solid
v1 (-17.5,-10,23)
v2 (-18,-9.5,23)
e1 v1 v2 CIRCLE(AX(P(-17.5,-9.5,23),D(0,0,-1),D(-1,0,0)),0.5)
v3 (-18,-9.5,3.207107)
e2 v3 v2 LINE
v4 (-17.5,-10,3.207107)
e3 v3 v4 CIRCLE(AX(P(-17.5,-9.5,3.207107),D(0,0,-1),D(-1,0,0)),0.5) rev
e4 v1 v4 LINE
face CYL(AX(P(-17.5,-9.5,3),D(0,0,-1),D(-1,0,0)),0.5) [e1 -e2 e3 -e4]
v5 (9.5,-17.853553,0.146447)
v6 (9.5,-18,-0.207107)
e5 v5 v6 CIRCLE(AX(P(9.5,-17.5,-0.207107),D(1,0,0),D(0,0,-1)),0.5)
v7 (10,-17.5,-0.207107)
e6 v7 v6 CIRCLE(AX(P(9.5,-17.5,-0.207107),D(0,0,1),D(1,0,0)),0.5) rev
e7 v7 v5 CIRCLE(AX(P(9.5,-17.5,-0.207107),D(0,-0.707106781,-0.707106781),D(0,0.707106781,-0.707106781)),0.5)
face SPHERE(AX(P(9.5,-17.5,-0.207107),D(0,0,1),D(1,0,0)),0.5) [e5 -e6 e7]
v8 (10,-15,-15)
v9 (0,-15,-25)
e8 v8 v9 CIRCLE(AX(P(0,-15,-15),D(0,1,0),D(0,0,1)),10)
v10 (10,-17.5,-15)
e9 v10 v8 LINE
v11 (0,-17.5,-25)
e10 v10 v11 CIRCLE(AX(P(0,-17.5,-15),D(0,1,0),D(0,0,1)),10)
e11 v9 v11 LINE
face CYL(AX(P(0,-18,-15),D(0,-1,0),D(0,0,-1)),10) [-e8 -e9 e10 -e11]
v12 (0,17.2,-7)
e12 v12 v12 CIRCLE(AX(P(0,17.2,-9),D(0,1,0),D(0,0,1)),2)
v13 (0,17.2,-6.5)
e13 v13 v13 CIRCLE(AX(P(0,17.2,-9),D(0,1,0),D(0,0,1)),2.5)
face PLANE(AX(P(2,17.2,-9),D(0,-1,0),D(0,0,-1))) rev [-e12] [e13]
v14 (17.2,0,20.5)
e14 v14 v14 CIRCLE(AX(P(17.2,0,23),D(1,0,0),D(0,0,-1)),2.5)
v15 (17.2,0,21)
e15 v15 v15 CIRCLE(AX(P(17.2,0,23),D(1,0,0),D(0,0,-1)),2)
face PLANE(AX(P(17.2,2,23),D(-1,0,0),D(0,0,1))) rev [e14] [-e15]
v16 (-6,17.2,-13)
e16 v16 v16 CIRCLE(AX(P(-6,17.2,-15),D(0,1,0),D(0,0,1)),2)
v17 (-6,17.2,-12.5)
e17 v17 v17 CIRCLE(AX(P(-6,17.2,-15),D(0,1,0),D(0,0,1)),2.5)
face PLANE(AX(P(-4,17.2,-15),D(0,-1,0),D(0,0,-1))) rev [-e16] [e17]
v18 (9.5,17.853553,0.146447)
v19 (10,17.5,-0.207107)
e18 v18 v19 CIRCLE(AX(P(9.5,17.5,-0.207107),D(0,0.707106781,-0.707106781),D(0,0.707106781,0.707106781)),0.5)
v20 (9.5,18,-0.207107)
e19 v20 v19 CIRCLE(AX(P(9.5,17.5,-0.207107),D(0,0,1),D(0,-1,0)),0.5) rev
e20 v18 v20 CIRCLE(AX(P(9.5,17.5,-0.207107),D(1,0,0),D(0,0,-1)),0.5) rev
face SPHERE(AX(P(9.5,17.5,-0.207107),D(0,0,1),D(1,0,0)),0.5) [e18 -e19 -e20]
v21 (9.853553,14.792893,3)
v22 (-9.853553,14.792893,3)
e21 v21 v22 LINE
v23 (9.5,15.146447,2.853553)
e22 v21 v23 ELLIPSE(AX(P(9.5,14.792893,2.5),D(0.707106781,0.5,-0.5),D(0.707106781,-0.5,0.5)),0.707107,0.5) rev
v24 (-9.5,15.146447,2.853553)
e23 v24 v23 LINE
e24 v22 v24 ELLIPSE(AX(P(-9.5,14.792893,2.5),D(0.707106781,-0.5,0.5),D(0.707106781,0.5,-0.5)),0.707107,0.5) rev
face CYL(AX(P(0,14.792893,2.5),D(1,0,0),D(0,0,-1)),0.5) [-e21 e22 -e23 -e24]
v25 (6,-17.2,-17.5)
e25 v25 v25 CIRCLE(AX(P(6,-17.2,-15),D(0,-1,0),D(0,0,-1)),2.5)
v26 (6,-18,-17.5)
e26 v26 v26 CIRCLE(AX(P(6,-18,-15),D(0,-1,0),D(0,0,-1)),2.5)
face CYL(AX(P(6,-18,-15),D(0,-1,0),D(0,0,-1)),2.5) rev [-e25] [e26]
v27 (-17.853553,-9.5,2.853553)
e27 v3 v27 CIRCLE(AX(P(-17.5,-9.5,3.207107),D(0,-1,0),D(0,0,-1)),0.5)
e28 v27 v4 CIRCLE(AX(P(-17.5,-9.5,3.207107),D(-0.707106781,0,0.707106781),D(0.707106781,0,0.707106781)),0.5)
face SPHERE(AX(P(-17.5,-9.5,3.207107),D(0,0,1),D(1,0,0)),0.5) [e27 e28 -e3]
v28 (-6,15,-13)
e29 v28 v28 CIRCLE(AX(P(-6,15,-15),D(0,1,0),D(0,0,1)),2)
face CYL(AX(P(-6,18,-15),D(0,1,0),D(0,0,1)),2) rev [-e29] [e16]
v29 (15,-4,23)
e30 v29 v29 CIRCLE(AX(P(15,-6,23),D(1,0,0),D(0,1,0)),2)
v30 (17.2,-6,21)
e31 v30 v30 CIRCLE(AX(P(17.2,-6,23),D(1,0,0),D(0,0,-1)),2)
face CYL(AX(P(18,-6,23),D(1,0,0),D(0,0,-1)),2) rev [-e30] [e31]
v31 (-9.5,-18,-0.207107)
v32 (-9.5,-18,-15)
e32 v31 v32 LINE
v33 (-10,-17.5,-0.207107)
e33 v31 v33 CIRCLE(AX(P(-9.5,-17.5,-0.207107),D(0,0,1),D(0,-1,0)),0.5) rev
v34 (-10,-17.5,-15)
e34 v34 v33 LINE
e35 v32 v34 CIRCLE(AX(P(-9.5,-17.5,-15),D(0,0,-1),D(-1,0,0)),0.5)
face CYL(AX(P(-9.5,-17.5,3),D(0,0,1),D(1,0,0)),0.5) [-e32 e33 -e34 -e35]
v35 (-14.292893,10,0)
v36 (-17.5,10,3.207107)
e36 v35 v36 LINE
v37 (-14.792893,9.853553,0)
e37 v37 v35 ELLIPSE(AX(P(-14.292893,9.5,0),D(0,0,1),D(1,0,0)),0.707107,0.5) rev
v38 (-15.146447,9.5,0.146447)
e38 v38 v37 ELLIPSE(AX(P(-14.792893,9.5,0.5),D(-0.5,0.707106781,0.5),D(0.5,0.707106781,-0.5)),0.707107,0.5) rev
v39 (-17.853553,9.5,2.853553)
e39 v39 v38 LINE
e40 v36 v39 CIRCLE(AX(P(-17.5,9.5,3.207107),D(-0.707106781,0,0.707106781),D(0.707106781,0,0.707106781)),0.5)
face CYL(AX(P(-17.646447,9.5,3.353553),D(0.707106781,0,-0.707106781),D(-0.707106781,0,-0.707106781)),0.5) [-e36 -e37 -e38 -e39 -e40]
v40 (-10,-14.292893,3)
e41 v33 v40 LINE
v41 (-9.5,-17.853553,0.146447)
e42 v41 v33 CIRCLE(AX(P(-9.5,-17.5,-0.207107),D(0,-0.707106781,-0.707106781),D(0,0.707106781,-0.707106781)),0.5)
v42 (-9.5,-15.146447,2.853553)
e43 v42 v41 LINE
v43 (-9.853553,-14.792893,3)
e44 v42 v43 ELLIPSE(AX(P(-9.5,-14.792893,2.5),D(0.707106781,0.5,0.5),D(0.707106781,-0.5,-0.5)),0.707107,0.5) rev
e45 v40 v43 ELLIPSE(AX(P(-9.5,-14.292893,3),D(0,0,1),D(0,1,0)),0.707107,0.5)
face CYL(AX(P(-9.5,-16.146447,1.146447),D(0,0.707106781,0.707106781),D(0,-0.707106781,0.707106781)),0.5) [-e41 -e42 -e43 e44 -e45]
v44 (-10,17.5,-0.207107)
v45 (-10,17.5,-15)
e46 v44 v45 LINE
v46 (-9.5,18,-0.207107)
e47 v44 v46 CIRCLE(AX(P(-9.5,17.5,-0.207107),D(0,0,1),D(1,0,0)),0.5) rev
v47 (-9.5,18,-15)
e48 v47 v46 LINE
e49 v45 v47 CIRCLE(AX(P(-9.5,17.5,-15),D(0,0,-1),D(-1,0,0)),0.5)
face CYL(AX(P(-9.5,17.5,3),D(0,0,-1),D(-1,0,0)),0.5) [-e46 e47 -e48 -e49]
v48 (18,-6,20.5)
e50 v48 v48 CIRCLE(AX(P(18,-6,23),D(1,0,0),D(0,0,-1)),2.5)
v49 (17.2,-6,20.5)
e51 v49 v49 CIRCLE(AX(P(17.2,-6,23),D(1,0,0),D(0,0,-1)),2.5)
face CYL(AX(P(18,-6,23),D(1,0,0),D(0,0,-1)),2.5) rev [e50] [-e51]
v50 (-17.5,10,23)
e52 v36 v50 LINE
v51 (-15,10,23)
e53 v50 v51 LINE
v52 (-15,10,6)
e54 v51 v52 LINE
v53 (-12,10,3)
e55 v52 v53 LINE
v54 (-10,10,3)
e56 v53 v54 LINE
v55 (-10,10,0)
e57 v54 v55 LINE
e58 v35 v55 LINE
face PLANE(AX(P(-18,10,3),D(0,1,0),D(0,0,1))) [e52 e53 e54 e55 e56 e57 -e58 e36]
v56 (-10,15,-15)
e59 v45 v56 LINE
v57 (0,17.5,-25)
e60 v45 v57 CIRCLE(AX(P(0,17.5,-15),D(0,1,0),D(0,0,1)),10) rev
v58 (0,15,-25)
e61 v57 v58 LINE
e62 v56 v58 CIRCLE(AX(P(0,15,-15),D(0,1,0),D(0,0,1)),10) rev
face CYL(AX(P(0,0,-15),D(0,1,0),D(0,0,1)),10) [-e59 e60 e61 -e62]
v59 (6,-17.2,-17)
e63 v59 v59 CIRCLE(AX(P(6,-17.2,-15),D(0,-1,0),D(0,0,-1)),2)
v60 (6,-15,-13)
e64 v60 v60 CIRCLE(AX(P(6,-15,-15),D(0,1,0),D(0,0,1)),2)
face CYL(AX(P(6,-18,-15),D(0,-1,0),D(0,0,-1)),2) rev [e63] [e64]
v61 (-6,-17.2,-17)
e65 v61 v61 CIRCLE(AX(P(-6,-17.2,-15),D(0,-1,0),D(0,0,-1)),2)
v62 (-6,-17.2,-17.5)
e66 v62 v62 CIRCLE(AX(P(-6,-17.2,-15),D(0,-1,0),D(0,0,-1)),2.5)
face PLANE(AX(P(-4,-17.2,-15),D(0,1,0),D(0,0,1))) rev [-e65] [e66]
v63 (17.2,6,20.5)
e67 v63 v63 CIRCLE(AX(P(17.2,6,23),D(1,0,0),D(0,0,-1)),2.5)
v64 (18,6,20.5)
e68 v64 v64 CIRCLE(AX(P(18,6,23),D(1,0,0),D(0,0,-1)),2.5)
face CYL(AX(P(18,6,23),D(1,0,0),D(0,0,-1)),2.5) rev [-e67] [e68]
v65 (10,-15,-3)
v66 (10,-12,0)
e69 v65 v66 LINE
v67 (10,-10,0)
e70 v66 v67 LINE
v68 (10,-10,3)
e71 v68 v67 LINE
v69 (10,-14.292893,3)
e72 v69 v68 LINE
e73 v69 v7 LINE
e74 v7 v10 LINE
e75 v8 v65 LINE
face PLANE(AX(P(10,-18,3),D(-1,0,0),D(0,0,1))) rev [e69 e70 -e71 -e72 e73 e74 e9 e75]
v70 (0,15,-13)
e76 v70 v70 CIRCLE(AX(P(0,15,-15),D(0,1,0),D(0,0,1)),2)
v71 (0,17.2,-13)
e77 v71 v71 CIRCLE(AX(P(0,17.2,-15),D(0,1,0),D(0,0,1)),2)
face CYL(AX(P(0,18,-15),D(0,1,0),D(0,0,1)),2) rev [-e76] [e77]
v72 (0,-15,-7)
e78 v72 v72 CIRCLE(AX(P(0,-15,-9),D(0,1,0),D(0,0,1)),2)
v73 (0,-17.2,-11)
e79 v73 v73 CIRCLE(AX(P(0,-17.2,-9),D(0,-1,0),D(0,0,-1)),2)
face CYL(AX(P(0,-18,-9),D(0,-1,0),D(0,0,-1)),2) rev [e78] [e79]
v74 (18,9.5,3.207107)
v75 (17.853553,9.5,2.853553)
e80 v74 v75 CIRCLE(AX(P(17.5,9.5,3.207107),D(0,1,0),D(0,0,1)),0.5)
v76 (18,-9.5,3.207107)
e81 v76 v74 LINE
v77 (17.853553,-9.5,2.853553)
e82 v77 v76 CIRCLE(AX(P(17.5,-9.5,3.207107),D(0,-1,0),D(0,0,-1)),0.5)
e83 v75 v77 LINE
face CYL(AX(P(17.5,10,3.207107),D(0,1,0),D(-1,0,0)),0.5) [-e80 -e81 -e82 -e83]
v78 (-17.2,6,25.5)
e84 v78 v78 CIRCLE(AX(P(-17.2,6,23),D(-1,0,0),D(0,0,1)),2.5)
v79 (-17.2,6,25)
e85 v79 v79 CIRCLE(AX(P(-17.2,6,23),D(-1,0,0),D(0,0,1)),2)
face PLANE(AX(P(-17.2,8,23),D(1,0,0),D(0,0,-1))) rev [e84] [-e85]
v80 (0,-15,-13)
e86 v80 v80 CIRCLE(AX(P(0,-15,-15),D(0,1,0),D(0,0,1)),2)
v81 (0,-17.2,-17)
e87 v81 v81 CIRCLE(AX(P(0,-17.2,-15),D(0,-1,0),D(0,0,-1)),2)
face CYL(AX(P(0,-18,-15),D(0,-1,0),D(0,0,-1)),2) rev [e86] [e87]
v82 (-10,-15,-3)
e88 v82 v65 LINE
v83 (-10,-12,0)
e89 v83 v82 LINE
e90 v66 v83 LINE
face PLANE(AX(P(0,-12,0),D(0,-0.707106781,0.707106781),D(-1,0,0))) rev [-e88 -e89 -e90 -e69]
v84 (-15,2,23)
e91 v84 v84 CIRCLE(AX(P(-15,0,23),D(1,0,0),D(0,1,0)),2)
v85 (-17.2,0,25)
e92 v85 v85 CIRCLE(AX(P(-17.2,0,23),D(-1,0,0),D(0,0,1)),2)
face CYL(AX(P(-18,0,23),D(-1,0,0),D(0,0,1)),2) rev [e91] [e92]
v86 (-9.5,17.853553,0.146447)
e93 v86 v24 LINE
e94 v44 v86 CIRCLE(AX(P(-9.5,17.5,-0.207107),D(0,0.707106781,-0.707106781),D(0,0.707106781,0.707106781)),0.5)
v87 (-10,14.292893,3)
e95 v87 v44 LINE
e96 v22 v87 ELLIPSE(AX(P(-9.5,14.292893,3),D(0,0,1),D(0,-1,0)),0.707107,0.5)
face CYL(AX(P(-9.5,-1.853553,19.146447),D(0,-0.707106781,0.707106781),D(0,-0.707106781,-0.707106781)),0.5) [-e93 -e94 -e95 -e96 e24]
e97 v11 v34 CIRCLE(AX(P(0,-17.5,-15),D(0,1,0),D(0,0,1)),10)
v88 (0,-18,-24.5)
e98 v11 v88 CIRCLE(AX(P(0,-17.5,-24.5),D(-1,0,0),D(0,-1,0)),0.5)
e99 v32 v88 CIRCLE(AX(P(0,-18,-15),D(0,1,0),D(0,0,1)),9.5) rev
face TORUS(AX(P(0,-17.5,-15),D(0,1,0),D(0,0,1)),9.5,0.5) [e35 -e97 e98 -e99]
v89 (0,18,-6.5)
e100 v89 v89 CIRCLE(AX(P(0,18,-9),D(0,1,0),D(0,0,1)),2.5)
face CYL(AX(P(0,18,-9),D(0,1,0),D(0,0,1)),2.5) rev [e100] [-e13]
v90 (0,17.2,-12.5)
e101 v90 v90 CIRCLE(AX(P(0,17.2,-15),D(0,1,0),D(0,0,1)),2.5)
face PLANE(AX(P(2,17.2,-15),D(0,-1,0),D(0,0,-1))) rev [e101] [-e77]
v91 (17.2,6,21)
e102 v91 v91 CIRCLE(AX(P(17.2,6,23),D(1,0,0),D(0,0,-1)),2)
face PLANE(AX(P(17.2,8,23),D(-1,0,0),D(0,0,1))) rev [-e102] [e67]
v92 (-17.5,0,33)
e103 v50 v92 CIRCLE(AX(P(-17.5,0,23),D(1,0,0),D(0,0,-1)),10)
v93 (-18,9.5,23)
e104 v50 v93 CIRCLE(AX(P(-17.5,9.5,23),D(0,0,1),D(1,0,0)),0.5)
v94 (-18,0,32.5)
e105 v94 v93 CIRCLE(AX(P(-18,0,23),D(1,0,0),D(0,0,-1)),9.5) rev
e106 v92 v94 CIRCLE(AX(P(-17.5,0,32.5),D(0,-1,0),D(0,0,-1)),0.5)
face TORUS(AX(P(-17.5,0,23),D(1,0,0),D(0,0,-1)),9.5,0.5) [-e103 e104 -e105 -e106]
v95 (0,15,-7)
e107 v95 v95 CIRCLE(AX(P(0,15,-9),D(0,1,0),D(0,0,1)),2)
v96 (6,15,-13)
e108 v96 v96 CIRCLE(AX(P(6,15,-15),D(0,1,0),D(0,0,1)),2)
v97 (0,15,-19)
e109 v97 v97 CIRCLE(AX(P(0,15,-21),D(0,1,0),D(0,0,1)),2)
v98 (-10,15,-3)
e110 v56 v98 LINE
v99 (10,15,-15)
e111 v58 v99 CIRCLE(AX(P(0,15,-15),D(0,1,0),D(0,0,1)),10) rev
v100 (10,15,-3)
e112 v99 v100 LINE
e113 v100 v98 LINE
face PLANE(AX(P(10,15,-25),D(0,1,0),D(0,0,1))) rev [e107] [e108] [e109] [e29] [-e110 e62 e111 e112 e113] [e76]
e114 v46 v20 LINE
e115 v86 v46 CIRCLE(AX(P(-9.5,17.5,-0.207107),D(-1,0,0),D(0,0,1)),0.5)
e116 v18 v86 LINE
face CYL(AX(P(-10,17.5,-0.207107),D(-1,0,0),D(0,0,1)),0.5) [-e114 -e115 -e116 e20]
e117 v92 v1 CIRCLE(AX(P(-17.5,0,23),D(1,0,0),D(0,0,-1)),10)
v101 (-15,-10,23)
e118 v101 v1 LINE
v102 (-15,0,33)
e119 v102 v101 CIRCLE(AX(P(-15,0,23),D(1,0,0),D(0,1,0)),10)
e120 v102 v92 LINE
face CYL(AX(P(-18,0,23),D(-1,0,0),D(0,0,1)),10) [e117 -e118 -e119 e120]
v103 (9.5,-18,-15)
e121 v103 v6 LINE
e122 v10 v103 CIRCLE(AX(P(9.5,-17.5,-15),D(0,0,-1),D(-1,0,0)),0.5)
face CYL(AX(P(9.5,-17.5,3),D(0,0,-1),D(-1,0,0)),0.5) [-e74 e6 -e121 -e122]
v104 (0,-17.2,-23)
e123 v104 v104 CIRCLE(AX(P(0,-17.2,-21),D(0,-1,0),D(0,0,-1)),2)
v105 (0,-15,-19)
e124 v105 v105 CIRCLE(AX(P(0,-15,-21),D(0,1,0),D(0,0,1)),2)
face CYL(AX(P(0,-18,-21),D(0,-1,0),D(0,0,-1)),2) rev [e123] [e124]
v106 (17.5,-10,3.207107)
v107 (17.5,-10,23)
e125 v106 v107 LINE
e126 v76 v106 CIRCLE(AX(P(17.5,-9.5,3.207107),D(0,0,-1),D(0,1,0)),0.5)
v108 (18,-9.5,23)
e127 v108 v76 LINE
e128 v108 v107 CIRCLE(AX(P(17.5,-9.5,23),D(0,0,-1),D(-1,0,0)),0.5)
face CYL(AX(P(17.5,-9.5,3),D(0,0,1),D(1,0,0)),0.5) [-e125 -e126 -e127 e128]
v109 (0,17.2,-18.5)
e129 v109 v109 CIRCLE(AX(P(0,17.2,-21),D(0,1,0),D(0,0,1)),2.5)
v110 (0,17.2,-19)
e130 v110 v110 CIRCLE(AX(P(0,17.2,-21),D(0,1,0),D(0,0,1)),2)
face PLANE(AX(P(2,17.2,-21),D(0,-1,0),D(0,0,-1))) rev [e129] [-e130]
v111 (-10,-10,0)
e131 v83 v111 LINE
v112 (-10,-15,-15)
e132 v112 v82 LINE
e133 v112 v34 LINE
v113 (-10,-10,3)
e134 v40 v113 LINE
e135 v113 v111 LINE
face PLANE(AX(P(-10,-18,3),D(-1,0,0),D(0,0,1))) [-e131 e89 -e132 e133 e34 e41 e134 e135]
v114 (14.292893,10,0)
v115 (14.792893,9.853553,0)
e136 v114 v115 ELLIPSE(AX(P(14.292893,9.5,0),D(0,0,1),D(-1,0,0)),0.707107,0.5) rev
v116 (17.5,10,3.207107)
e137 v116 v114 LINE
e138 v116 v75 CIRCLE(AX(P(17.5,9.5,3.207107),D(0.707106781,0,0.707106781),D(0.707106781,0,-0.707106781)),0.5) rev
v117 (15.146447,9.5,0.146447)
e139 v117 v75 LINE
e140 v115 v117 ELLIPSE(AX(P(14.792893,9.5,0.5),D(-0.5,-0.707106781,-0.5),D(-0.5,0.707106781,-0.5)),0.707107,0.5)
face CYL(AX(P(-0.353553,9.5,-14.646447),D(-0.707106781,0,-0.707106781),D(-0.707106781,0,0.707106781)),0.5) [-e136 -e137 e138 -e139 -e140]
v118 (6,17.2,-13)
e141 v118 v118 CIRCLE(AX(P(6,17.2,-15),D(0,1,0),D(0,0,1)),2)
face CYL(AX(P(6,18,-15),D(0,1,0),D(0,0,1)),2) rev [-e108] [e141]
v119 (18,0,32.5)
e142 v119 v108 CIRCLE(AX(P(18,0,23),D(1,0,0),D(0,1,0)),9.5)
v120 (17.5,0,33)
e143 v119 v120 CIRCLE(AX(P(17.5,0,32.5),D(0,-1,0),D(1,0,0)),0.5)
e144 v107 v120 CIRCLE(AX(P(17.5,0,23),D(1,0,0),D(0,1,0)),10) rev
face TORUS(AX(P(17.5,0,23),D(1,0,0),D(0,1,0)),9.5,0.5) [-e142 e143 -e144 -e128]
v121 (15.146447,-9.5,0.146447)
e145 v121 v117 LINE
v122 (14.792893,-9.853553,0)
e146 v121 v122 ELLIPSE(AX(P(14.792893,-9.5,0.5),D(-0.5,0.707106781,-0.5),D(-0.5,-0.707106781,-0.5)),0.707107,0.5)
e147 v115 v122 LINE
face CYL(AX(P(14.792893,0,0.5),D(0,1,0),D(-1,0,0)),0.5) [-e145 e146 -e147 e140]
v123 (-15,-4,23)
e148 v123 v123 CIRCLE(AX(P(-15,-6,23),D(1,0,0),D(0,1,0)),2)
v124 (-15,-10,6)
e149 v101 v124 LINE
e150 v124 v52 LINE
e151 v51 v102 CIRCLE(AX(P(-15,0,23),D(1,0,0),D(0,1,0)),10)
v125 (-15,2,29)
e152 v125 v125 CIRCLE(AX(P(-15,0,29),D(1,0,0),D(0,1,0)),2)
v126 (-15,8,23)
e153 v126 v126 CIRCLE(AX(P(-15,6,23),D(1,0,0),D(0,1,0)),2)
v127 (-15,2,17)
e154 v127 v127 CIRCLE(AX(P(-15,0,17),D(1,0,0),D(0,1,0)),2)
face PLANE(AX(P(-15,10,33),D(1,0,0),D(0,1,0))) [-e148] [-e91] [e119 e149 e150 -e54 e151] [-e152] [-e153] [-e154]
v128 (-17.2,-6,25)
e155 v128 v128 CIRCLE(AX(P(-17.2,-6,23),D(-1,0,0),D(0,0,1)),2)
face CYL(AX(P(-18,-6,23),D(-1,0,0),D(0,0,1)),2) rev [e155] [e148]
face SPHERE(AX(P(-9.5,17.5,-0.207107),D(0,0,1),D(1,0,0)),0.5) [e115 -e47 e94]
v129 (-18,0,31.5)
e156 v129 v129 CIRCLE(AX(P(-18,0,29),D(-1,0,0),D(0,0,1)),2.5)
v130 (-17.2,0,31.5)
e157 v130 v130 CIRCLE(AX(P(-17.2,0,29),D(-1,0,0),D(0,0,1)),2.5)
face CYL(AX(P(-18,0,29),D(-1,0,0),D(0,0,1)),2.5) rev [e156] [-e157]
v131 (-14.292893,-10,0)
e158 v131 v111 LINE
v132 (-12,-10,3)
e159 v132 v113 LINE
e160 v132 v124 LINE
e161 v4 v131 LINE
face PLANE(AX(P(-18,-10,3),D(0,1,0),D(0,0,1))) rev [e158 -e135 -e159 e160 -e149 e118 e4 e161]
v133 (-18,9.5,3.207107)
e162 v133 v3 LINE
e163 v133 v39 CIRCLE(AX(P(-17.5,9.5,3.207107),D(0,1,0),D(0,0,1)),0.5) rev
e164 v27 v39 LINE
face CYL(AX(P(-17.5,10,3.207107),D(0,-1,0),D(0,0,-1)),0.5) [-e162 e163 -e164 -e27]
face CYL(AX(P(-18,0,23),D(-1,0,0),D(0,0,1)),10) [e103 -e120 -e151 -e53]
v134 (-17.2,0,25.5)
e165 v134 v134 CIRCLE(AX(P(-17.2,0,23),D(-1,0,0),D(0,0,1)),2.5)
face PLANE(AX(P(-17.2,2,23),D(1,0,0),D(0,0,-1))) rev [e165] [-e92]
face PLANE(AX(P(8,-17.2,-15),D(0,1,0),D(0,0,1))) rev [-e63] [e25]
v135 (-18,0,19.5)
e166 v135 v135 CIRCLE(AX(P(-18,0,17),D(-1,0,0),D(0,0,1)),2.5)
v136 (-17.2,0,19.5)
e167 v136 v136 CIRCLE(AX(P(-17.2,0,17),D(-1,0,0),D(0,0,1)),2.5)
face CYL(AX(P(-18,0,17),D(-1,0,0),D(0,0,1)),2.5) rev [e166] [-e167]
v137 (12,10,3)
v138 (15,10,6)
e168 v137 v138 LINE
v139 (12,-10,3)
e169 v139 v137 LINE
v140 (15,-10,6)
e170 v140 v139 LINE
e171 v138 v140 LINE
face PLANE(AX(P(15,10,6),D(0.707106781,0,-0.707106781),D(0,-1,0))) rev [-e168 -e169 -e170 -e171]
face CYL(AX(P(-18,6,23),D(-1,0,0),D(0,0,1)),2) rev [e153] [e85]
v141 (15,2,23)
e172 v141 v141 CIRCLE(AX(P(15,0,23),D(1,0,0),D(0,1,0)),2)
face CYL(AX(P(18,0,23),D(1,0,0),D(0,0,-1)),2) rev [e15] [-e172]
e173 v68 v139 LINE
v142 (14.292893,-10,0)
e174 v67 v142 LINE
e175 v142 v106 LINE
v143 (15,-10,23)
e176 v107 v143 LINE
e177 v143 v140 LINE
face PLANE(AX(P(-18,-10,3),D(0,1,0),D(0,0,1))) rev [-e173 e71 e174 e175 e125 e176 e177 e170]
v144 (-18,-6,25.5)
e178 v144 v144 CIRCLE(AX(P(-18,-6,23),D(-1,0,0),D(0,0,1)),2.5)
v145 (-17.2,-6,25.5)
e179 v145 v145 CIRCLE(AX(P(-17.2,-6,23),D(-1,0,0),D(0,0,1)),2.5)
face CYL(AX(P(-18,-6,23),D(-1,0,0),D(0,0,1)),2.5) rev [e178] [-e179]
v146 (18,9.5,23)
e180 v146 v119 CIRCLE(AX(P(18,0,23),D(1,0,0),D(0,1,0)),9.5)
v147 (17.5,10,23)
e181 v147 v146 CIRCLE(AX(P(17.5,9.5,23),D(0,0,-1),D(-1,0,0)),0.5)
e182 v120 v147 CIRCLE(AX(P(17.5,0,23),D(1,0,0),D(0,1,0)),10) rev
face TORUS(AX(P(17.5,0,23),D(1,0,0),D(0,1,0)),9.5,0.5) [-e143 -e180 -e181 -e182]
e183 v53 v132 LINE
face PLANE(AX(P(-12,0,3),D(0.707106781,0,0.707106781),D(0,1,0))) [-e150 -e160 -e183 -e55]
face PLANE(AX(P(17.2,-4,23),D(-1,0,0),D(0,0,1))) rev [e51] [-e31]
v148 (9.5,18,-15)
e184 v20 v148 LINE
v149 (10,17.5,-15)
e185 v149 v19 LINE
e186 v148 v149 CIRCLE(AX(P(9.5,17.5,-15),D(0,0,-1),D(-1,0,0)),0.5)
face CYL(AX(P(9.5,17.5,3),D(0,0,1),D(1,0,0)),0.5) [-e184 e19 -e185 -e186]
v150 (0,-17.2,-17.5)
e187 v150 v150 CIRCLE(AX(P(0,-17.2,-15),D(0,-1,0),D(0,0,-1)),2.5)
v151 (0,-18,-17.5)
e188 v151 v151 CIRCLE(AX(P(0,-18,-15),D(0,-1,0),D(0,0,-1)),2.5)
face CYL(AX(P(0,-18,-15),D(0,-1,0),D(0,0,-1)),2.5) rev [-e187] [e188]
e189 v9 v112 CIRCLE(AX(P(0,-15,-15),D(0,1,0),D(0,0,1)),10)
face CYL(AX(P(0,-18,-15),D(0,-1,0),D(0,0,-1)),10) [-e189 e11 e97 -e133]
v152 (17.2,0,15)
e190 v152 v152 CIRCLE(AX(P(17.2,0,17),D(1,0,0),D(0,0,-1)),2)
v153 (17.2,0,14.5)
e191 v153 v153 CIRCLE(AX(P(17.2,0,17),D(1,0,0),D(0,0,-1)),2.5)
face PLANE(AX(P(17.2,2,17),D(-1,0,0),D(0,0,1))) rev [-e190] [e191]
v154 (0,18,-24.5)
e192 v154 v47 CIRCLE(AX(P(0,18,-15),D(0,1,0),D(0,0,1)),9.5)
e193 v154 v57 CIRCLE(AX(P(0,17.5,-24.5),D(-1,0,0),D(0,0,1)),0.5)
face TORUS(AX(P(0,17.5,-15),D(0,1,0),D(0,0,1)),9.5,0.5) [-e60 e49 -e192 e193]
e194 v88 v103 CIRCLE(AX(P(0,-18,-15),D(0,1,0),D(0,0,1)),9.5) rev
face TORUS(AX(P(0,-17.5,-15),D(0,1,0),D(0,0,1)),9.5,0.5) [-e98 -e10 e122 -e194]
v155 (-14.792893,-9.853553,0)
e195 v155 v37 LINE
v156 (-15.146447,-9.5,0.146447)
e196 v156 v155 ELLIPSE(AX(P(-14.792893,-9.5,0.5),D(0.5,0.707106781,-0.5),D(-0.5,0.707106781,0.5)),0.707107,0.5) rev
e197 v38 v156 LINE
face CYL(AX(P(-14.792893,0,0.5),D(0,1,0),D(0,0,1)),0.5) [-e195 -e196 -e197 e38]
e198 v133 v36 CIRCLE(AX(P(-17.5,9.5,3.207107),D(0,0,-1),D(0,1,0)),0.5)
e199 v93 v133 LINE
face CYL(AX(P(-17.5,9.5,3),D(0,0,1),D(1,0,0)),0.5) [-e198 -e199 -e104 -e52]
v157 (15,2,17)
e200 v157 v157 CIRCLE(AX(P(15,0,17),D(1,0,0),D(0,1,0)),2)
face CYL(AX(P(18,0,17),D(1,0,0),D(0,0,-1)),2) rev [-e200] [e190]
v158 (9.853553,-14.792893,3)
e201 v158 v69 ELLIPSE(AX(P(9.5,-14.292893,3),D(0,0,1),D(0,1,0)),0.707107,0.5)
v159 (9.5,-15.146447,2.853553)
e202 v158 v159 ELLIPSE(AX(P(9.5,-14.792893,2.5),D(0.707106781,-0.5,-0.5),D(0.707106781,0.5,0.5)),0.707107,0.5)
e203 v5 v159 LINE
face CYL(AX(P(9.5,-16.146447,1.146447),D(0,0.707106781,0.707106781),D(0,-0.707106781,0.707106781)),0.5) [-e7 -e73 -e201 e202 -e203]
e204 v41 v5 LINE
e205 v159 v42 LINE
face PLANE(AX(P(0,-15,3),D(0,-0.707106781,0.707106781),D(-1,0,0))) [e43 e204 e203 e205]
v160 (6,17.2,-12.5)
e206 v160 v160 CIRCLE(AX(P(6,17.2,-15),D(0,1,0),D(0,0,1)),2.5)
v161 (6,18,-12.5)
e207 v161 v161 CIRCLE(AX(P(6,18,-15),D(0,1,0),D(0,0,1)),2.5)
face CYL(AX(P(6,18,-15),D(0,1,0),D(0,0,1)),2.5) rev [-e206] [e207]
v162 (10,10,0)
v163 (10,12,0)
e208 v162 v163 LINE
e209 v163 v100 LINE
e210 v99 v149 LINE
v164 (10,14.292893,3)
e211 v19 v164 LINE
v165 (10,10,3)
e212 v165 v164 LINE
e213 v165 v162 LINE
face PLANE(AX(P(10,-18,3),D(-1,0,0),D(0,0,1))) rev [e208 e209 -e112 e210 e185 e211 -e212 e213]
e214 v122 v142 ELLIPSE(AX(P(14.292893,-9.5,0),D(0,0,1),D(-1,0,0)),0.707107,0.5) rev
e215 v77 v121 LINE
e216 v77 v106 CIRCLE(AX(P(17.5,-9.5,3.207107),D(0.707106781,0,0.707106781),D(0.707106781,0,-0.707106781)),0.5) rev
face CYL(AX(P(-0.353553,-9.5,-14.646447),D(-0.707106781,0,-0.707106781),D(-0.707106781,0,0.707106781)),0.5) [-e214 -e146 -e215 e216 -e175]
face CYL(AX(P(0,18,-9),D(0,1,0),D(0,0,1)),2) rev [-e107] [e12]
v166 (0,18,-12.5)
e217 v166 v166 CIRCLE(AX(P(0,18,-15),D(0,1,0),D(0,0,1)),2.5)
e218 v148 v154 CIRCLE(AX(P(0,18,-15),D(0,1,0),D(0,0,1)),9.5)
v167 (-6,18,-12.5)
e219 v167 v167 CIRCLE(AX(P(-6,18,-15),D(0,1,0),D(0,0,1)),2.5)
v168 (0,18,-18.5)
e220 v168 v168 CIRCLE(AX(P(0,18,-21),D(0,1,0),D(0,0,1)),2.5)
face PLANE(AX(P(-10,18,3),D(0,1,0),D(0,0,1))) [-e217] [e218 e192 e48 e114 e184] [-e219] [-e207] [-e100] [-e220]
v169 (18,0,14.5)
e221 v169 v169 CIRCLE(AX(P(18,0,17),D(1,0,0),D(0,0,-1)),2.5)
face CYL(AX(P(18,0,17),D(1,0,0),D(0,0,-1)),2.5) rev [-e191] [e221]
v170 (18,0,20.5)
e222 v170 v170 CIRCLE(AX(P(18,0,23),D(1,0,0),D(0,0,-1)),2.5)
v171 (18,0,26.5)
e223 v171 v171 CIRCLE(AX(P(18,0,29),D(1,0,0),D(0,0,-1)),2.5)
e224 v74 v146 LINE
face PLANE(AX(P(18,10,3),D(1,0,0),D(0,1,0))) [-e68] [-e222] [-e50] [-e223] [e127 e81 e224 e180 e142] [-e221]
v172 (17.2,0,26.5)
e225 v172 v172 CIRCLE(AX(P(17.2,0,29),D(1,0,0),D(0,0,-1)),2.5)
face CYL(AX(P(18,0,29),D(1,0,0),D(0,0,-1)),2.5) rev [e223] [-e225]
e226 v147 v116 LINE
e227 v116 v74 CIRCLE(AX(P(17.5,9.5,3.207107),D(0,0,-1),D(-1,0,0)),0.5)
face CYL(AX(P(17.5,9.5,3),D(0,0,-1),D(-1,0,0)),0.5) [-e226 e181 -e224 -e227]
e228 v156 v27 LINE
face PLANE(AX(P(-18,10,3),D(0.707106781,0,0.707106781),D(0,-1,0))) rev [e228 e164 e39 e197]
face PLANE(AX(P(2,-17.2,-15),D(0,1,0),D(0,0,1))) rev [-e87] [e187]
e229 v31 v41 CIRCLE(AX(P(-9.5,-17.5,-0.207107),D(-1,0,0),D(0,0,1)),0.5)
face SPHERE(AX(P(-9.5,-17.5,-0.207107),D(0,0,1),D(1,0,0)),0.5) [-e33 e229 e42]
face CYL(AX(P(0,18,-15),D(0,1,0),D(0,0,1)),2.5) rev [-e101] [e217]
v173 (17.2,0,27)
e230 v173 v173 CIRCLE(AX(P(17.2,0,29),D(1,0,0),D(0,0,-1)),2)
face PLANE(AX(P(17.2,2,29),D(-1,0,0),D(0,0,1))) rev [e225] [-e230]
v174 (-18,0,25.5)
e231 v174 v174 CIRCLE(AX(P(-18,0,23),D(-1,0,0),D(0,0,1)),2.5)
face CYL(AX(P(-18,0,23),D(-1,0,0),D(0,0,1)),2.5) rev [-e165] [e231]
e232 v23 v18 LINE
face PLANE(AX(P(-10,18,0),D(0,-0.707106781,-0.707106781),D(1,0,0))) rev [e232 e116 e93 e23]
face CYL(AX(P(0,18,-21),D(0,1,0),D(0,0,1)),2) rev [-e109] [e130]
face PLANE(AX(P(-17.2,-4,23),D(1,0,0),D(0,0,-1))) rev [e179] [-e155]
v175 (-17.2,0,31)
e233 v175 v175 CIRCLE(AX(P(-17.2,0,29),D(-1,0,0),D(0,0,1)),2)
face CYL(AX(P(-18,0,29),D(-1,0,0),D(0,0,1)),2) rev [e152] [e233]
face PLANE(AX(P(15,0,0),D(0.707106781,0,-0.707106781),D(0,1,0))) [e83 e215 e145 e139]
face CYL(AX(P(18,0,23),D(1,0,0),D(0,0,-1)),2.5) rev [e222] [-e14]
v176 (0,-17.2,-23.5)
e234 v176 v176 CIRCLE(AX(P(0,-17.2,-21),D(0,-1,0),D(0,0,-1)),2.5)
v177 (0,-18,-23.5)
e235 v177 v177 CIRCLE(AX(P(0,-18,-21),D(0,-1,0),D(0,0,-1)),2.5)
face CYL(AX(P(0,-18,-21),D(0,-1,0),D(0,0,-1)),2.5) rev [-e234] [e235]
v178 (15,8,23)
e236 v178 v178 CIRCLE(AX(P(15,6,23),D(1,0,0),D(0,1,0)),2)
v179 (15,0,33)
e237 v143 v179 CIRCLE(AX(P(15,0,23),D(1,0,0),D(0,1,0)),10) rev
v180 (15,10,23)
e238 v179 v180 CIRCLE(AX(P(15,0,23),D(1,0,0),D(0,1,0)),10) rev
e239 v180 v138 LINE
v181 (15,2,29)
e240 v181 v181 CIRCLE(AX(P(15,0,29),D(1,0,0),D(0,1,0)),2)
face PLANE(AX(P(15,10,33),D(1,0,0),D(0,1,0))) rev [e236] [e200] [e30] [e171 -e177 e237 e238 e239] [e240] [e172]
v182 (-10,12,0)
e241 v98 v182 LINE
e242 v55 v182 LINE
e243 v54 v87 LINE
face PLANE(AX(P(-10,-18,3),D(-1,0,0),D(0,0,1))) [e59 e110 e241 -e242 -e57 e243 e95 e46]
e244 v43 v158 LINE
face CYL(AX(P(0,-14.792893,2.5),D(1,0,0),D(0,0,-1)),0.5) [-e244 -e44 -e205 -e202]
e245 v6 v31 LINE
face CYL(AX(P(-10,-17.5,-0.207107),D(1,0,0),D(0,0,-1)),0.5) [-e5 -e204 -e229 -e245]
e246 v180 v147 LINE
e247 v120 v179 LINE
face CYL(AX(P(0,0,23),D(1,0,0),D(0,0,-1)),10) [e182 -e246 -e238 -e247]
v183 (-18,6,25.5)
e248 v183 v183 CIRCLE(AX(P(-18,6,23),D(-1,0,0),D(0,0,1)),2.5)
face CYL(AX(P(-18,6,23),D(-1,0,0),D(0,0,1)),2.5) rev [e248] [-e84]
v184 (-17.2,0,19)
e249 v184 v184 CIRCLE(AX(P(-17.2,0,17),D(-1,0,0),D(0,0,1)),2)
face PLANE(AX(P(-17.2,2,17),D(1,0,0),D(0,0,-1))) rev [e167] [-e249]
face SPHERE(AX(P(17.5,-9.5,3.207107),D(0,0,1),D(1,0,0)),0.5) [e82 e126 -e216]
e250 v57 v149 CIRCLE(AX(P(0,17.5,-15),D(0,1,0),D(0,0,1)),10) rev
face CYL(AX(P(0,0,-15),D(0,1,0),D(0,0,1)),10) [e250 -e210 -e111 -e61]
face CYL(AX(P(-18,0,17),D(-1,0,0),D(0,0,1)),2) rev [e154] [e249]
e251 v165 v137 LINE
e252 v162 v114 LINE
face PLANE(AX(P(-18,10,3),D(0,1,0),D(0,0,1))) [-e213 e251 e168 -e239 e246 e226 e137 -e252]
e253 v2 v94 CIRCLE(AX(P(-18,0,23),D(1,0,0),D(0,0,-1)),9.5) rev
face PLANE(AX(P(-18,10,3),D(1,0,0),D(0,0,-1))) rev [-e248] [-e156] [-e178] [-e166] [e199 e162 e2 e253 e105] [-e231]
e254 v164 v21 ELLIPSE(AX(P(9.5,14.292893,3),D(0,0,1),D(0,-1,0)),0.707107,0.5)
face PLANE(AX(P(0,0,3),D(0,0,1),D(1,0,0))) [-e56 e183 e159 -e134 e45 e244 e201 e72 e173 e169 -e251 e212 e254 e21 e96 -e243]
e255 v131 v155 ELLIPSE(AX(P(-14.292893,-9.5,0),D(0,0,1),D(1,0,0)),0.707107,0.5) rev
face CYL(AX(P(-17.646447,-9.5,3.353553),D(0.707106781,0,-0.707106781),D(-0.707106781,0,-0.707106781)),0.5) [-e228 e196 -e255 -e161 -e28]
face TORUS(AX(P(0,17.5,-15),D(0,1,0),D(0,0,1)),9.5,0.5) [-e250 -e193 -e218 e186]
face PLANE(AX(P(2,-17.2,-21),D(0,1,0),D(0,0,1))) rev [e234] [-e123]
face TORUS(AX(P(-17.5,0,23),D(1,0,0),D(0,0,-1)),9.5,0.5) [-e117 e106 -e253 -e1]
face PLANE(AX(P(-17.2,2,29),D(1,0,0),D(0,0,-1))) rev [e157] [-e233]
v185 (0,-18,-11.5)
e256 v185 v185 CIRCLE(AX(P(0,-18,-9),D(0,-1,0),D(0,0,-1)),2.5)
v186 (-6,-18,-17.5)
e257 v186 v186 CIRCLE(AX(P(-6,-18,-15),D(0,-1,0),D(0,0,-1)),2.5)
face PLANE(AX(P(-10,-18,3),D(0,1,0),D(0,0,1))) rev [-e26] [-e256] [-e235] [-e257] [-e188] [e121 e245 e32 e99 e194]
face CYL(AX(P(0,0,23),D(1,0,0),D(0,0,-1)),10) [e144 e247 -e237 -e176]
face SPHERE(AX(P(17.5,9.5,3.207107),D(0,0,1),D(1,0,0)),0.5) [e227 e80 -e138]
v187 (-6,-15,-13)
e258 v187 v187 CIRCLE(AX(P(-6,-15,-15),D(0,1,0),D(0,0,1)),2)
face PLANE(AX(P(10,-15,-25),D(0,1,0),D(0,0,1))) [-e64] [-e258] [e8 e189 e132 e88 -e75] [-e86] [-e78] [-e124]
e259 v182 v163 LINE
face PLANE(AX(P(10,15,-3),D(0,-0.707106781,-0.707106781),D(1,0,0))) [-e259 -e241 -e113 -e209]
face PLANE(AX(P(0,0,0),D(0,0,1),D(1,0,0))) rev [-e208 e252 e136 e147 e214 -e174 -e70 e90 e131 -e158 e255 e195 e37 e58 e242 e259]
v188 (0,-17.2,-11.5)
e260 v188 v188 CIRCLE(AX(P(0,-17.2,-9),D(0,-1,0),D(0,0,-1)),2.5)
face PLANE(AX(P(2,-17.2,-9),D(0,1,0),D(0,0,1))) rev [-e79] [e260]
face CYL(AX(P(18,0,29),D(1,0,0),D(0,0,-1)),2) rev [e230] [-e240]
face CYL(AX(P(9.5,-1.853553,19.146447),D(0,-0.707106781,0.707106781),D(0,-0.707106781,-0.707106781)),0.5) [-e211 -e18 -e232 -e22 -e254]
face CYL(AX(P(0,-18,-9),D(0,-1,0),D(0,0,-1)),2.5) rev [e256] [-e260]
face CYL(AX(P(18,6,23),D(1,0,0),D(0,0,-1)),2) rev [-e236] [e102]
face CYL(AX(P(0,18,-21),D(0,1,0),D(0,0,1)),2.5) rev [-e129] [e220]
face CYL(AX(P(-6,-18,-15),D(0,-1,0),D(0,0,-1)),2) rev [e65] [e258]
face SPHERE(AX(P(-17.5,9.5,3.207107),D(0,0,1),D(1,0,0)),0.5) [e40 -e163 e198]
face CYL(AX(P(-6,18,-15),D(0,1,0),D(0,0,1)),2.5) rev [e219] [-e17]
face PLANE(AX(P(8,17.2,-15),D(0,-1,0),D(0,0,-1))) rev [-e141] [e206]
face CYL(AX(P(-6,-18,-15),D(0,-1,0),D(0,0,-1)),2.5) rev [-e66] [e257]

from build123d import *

# Parameters (mm, degrees)
SKETCH1_W                              = 36
SKETCH1_H                              = 20
SKETCH1_W_2                            = 20
SKETCH1_H_2                            = 36
BOSS_EXTRUDE1_DEPTH                    = 3
SKETCH2_W                              = 20
SKETCH2_H                              = 3
BOSS_EXTRUDE2_DEPTH                    = 25
CHAMFER1_SIZE                          = 3
FILLET1_R                              = 10
FILLET2_R                              = 10
CBORE_FOR_M5_HEX_HEAD_BOLT1_AT_2_COUNT = 2
CBORE_FOR_M5_HEX_HEAD_BOLT1_AT_2_PITCH = 6
CIRPATTERN1_COUNT                      = 4
FILLET1_OF_MIRROR1_R                   = 10
FILLET2_OF_MIRROR1_R                   = 10
CHAMFER2_SIZE                          = 3
SKETCH6_W                              = 3
SKETCH6_H                              = 20
BOSS_EXTRUDE3_DEPTH                    = 30
FILLET3_R                              = 10
FILLET4_R                              = 10
CBORE_FOR_M5_HEX_HEAD_BOLT2_AT_2_COUNT = 2
CBORE_FOR_M5_HEX_HEAD_BOLT2_AT_2_PITCH = 6
CIRPATTERN2_COUNT                      = 4
CHAMFER3_SIZE                          = 3
FILLET3_OF_MIRROR2_R                   = 10
FILLET4_OF_MIRROR2_R                   = 10
FILLET5_R                              = 0.5
CHAMFER5_SIZE                          = 3
FILLET6_R                              = 0.5
FILLET7_R                              = 0.5
FILLET8_R                              = 0.5


with BuildPart() as part:
    # Sketch1 → Boss-Extrude1 (new body)
    with BuildSketch(Plane.XY):
        Rectangle(SKETCH1_W, SKETCH1_H)
        Rectangle(SKETCH1_W_2, SKETCH1_H_2)
    extrude(amount=BOSS_EXTRUDE1_DEPTH)

    # Sketch2 → Boss-Extrude2 (add)
    with BuildSketch(Plane(origin=(0, 0, 0), x_dir=(-1, 0, 0), z_dir=(0, 0, -1))):
        with Locations((0, 16.5)):
            Rectangle(SKETCH2_W, SKETCH2_H)
    boss_extrude2 = extrude(amount=BOSS_EXTRUDE2_DEPTH)

    # Chamfer1
    chamfer1_edges = [part.edges().sort_by_distance(p)[0] for p in [
        (0, 18, 3),
        (0, 15, 0),
    ]]
    chamfer(chamfer1_edges, length=CHAMFER1_SIZE)

    # Fillet1
    fillet1_edges = [part.edges().sort_by_distance(p)[0] for p in [
        (10, 16.5, -25),
    ]]
    fillet(fillet1_edges, radius=FILLET1_R)

    # Fillet2
    fillet2_edges = [part.edges().sort_by_distance(p)[0] for p in [
        (-10, 16.5, -25),
    ]]
    fillet(fillet2_edges, radius=FILLET2_R - 0.0001)  # a hair under: the kernel refuses the full size

    # Sketch4 → CBORE for M5 Hex Head Bolt1 (revolve, cut)
    with BuildSketch(Plane(origin=(0, 18, -15), x_dir=(0, 0, 1), z_dir=(1, 0, 0))):
        Polygon((0, 0), (0, 5.178090033), (2, 4), (2, 0.8), (2.5, 0.8), (2.5, 0), align=None)
    cbore_for_m5_hex_head_bolt1 = revolve(axis=Axis((0, 24.35, -15), (0, -1, 0)), mode=Mode.SUBTRACT)

    # CBORE for M5 Hex Head Bolt1 at 2: CBORE for M5 Hex Head Bolt1 ×2
    with Locations(*[(0, 0, -i * CBORE_FOR_M5_HEX_HEAD_BOLT1_AT_2_PITCH) for i in range(1, CBORE_FOR_M5_HEX_HEAD_BOLT1_AT_2_COUNT)]):
        add(cbore_for_m5_hex_head_bolt1, mode=Mode.SUBTRACT)

    # CirPattern1: CBORE for M5 Hex Head Bolt1 ×4 about axis
    cirpattern1_axis = Axis((0, 0, -15), (0, 1, 0))
    for i in range(1, CIRPATTERN1_COUNT):
        add(cbore_for_m5_hex_head_bolt1.rotate(cirpattern1_axis, i * 360 / CIRPATTERN1_COUNT), mode=Mode.SUBTRACT)

    # CirPattern1 copy 1 sketch → CirPattern1 copy 1 (revolve, cut)
    with BuildSketch(Plane(origin=(-6, 18, -15), x_dir=(1, 0, 0), z_dir=(0, 0, -1))):
        Polygon((0, 0), (0, 5.178090033), (2, 4), (2, 0.8), (2.5, 0.8), (2.5, 0), align=None)
    revolve(axis=Axis((-6, 24.35, -15), (0, -1, 0)), mode=Mode.SUBTRACT)

    # CirPattern1 copy 2 sketch → CirPattern1 copy 2 (revolve, cut)
    with BuildSketch(Plane(origin=(0, 18, -9), x_dir=(0, 0, -1), z_dir=(-1, 0, 0))):
        Polygon((0, 0), (0, 5.178090033), (2, 4), (2, 0.8), (2.5, 0.8), (2.5, 0), align=None)
    revolve(axis=Axis((0, 24.35, -9), (0, -1, 0)), mode=Mode.SUBTRACT)

    # CirPattern1 copy 3 sketch → CirPattern1 copy 3 (revolve, cut)
    with BuildSketch(Plane(origin=(6, 18, -15), x_dir=(-1, 0, 0), z_dir=(0, 0, 1))):
        Polygon((0, 0), (0, 5.178090033), (2, 4), (2, 0.8), (2.5, 0.8), (2.5, 0), align=None)
    revolve(axis=Axis((6, 24.35, -15), (0, -1, 0)), mode=Mode.SUBTRACT)

    # Mirror1: Boss-Extrude2, CBORE for M5 Hex Head Bolt1 across plane
    add(boss_extrude2.mirror(Plane.ZX))
    add(cbore_for_m5_hex_head_bolt1.mirror(Plane.ZX), mode=Mode.SUBTRACT)

    # Mirror1 copy 1 sketch → Mirror1 copy 1 (revolve, cut)
    with BuildSketch(Plane(origin=(0, -18, -21), x_dir=(0, 0, 1), z_dir=(1, 0, 0))):
        Polygon((0, 0), (0, -5.178090033), (2, -4), (2, -0.8), (2.5, -0.8), (2.5, 0), align=None)
    revolve(axis=Axis((0, -24.35, -21), (0, -1, 0)), mode=Mode.SUBTRACT)

    # Mirror1 copy 2 sketch → Mirror1 copy 2 (revolve, cut)
    with BuildSketch(Plane(origin=(0, -18, -15), x_dir=(1, 0, 0), z_dir=(0, 0, -1))):
        Polygon((0, 0), (0, -5.178090033), (2, -4), (2, -0.8), (2.5, -0.8), (2.5, 0), align=None)
    revolve(axis=Axis((0, -24.35, -15), (0, -1, 0)), mode=Mode.SUBTRACT)

    # Mirror1 copy 3 sketch → Mirror1 copy 3 (revolve, cut)
    with BuildSketch(Plane(origin=(0, -18, -15), x_dir=(0, 0, -1), z_dir=(-1, 0, 0))):
        Polygon((0, 0), (0, -5.178090033), (2, -4), (2, -0.8), (2.5, -0.8), (2.5, 0), align=None)
    revolve(axis=Axis((0, -24.35, -15), (0, -1, 0)), mode=Mode.SUBTRACT)

    # Mirror1 copy 4 sketch → Mirror1 copy 4 (revolve, cut)
    with BuildSketch(Plane(origin=(0, -18, -15), x_dir=(-1, 0, 0), z_dir=(0, 0, 1))):
        Polygon((0, 0), (0, -5.178090033), (2, -4), (2, -0.8), (2.5, -0.8), (2.5, 0), align=None)
    revolve(axis=Axis((0, -24.35, -15), (0, -1, 0)), mode=Mode.SUBTRACT)

    # Mirror1 copy 5 sketch → Mirror1 copy 5 (revolve, cut)
    with BuildSketch(Plane(origin=(-6, -18, -15), x_dir=(1, 0, 0), z_dir=(0, 0, -1))):
        Polygon((0, 0), (0, -5.178090033), (2, -4), (2, -0.8), (2.5, -0.8), (2.5, 0), align=None)
    revolve(axis=Axis((-6, -24.35, -15), (0, -1, 0)), mode=Mode.SUBTRACT)

    # Mirror1 copy 6 sketch → Mirror1 copy 6 (revolve, cut)
    with BuildSketch(Plane(origin=(0, -18, -9), x_dir=(0, 0, -1), z_dir=(-1, 0, 0))):
        Polygon((0, 0), (0, -5.178090033), (2, -4), (2, -0.8), (2.5, -0.8), (2.5, 0), align=None)
    revolve(axis=Axis((0, -24.35, -9), (0, -1, 0)), mode=Mode.SUBTRACT)

    # Mirror1 copy 7 sketch → Mirror1 copy 7 (revolve, cut)
    with BuildSketch(Plane(origin=(6, -18, -15), x_dir=(-1, 0, 0), z_dir=(0, 0, 1))):
        Polygon((0, 0), (0, -5.178090033), (2, -4), (2, -0.8), (2.5, -0.8), (2.5, 0), align=None)
    revolve(axis=Axis((6, -24.35, -15), (0, -1, 0)), mode=Mode.SUBTRACT)

    # Fillet1 of Mirror1
    fillet1_of_mirror1_edges = [part.edges().sort_by_distance(p)[0] for p in [
        (10, -16.5, -25),
    ]]
    fillet(fillet1_of_mirror1_edges, radius=FILLET1_OF_MIRROR1_R)

    # Fillet2 of Mirror1
    fillet2_of_mirror1_edges = [part.edges().sort_by_distance(p)[0] for p in [
        (-10, -16.5, -25),
    ]]
    fillet(fillet2_of_mirror1_edges, radius=FILLET2_OF_MIRROR1_R - 0.0001)  # a hair under: the kernel refuses the full size

    # Chamfer2
    chamfer2_edges = [part.edges().sort_by_distance(p)[0] for p in [
        (0, -15, 0),
        (0, -18, 3),
    ]]
    chamfer(chamfer2_edges, length=CHAMFER2_SIZE)

    # Sketch6 → Boss-Extrude3 (add)
    with BuildSketch(Plane.XY.offset(3)):
        with Locations((16.5, 0)):
            Rectangle(SKETCH6_W, SKETCH6_H)
    boss_extrude3 = extrude(amount=BOSS_EXTRUDE3_DEPTH)

    # Fillet3
    fillet3_edges = [part.edges().sort_by_distance(p)[0] for p in [
        (16.5, 10, 33),
    ]]
    fillet(fillet3_edges, radius=FILLET3_R)

    # Fillet4
    fillet4_edges = [part.edges().sort_by_distance(p)[0] for p in [
        (16.5, -10, 33),
    ]]
    fillet(fillet4_edges, radius=FILLET4_R - 0.0001)  # a hair under: the kernel refuses the full size

    # Sketch9 → CBORE for M5 Hex Head Bolt2 (revolve, cut)
    with BuildSketch(Plane(origin=(18, 0, 23), x_dir=(0, 0, -1), z_dir=(0, 1, 0))):
        Polygon((0, 0), (0, 5.178090033), (2, 4), (2, 0.8), (2.5, 0.8), (2.5, 0), align=None)
    cbore_for_m5_hex_head_bolt2 = revolve(axis=Axis((24.35, 0, 23), (-1, 0, 0)), mode=Mode.SUBTRACT)

    # CBORE for M5 Hex Head Bolt2 at 2: CBORE for M5 Hex Head Bolt2 ×2
    with Locations(*[(0, 0, i * CBORE_FOR_M5_HEX_HEAD_BOLT2_AT_2_PITCH) for i in range(1, CBORE_FOR_M5_HEX_HEAD_BOLT2_AT_2_COUNT)]):
        add(cbore_for_m5_hex_head_bolt2, mode=Mode.SUBTRACT)

    # CirPattern2: CBORE for M5 Hex Head Bolt2 ×4 about axis
    cirpattern2_axis = Axis((0, 0, 23), (1, 0, 0))
    for i in range(1, CIRPATTERN2_COUNT):
        add(cbore_for_m5_hex_head_bolt2.rotate(cirpattern2_axis, i * 360 / CIRPATTERN2_COUNT), mode=Mode.SUBTRACT)

    # CirPattern2 copy 1 sketch → CirPattern2 copy 1 (revolve, cut)
    with BuildSketch(Plane(origin=(18, -6, 23), x_dir=(0, 1, 0), z_dir=(0, 0, 1))):
        Polygon((0, 0), (0, 5.178090033), (2, 4), (2, 0.8), (2.5, 0.8), (2.5, 0), align=None)
    revolve(axis=Axis((24.35, -6, 23), (-1, 0, 0)), mode=Mode.SUBTRACT)

    # CirPattern2 copy 2 sketch → CirPattern2 copy 2 (revolve, cut)
    with BuildSketch(Plane(origin=(18, 0, 17), x_dir=(0, 0, 1), z_dir=(0, -1, 0))):
        Polygon((0, 0), (0, 5.178090033), (2, 4), (2, 0.8), (2.5, 0.8), (2.5, 0), align=None)
    revolve(axis=Axis((24.35, 0, 17), (-1, 0, 0)), mode=Mode.SUBTRACT)

    # CirPattern2 copy 3 sketch → CirPattern2 copy 3 (revolve, cut)
    with BuildSketch(Plane(origin=(18, 6, 23), x_dir=(0, -1, 0), z_dir=(0, 0, -1))):
        Polygon((0, 0), (0, 5.178090033), (2, 4), (2, 0.8), (2.5, 0.8), (2.5, 0), align=None)
    revolve(axis=Axis((24.35, 6, 23), (-1, 0, 0)), mode=Mode.SUBTRACT)

    # Chamfer3
    chamfer3_edges = [part.edges().sort_by_distance(p)[0] for p in [
        (15, 0, 3),
        (18, 0, 0),
    ]]
    chamfer(chamfer3_edges, length=CHAMFER3_SIZE)

    # Mirror2: Boss-Extrude3, CBORE for M5 Hex Head Bolt2 across plane
    add(boss_extrude3.mirror(Plane(origin=(0, 0, 0), x_dir=(0, 0, 1), z_dir=(1, 0, 0))))
    add(cbore_for_m5_hex_head_bolt2.mirror(Plane(origin=(0, 0, 0), x_dir=(0, 0, 1), z_dir=(1, 0, 0))), mode=Mode.SUBTRACT)

    # Mirror2 copy 1 sketch → Mirror2 copy 1 (revolve, cut)
    with BuildSketch(Plane(origin=(-18, 0, 29), x_dir=(0, 0, -1), z_dir=(0, 1, 0))):
        Polygon((0, 0), (0, -5.178090033), (2, -4), (2, -0.8), (2.5, -0.8), (2.5, 0), align=None)
    revolve(axis=Axis((-24.35, 0, 29), (-1, 0, 0)), mode=Mode.SUBTRACT)

    # Mirror2 copy 2 sketch → Mirror2 copy 2 (revolve, cut)
    with BuildSketch(Plane(origin=(-18, 0, 23), x_dir=(0, 1, 0), z_dir=(0, 0, 1))):
        Polygon((0, 0), (0, -5.178090033), (2, -4), (2, -0.8), (2.5, -0.8), (2.5, 0), align=None)
    revolve(axis=Axis((-24.35, 0, 23), (-1, 0, 0)), mode=Mode.SUBTRACT)

    # Mirror2 copy 3 sketch → Mirror2 copy 3 (revolve, cut)
    with BuildSketch(Plane(origin=(-18, 0, 23), x_dir=(0, 0, 1), z_dir=(0, -1, 0))):
        Polygon((0, 0), (0, -5.178090033), (2, -4), (2, -0.8), (2.5, -0.8), (2.5, 0), align=None)
    revolve(axis=Axis((-24.35, 0, 23), (-1, 0, 0)), mode=Mode.SUBTRACT)

    # Mirror2 copy 4 sketch → Mirror2 copy 4 (revolve, cut)
    with BuildSketch(Plane(origin=(-18, 0, 23), x_dir=(0, -1, 0), z_dir=(0, 0, -1))):
        Polygon((0, 0), (0, -5.178090033), (2, -4), (2, -0.8), (2.5, -0.8), (2.5, 0), align=None)
    revolve(axis=Axis((-24.35, 0, 23), (-1, 0, 0)), mode=Mode.SUBTRACT)

    # Mirror2 copy 5 sketch → Mirror2 copy 5 (revolve, cut)
    with BuildSketch(Plane(origin=(-18, -6, 23), x_dir=(0, 1, 0), z_dir=(0, 0, 1))):
        Polygon((0, 0), (0, -5.178090033), (2, -4), (2, -0.8), (2.5, -0.8), (2.5, 0), align=None)
    revolve(axis=Axis((-24.35, -6, 23), (-1, 0, 0)), mode=Mode.SUBTRACT)

    # Mirror2 copy 6 sketch → Mirror2 copy 6 (revolve, cut)
    with BuildSketch(Plane(origin=(-18, 0, 17), x_dir=(0, 0, 1), z_dir=(0, -1, 0))):
        Polygon((0, 0), (0, -5.178090033), (2, -4), (2, -0.8), (2.5, -0.8), (2.5, 0), align=None)
    revolve(axis=Axis((-24.35, 0, 17), (-1, 0, 0)), mode=Mode.SUBTRACT)

    # Mirror2 copy 7 sketch → Mirror2 copy 7 (revolve, cut)
    with BuildSketch(Plane(origin=(-18, 6, 23), x_dir=(0, -1, 0), z_dir=(0, 0, -1))):
        Polygon((0, 0), (0, -5.178090033), (2, -4), (2, -0.8), (2.5, -0.8), (2.5, 0), align=None)
    revolve(axis=Axis((-24.35, 6, 23), (-1, 0, 0)), mode=Mode.SUBTRACT)

    # Fillet3 of Mirror2
    fillet3_of_mirror2_edges = [part.edges().sort_by_distance(p)[0] for p in [
        (-16.5, 10, 33),
    ]]
    fillet(fillet3_of_mirror2_edges, radius=FILLET3_OF_MIRROR2_R)

    # Fillet4 of Mirror2
    fillet4_of_mirror2_edges = [part.edges().sort_by_distance(p)[0] for p in [
        (-16.5, -10, 33),
    ]]
    fillet(fillet4_of_mirror2_edges, radius=FILLET4_OF_MIRROR2_R - 0.0001)  # a hair under: the kernel refuses the full size

    # Fillet5
    fillet5_edges = [part.edges().sort_by_distance(p)[0] for p in [
        (18, 10, 13),
        (18, 7.071067812, 30.071067812),
        (18, -10, 13.00005),
        (18, -7.071097101, 30.071097101),
        (15, 0, 0),
        (16.5, -10, 1.5),
        (18, 0, 3),
        (16.5, 10, 1.5),
    ]]
    fillet(fillet5_edges, radius=FILLET5_R)

    # Chamfer5
    chamfer5_edges = [part.edges().sort_by_distance(p)[0] for p in [
        (-18, 0, 0),
        (-15, 0, 3),
    ]]
    chamfer(chamfer5_edges, length=CHAMFER5_SIZE)

    # Fillet6
    fillet6_edges = [part.edges().sort_by_distance(p)[0] for p in [
        (-18, 10, 13),
        (-18, 7.071067812, 30.071067812),
        (-18, -10, 13.00005),
        (-18, -7.071097101, 30.071097101),
        (-18, 0, 3),
        (-16.5, -10, 1.5),
        (-15, 0, 0),
        (-16.5, 10, 1.5),
    ]]
    fillet(fillet6_edges, radius=FILLET6_R)

    # Fillet7
    fillet7_edges = [part.edges().sort_by_distance(p)[0] for p in [
        (10, 18, -7.5),
        (-10, 18, -7.50005),
        (0, 18, 0),
        (10, 16.5, 1.5),
        (0, 15, 3),
        (-10, 16.5, 1.5),
        (7.071067812, 18, -22.071067812),
        (-7.071097101, 18, -22.071097101),
    ]]
    fillet(fillet7_edges, radius=FILLET7_R)

    # Fillet8
    fillet8_edges = [part.edges().sort_by_distance(p)[0] for p in [
        (7.071067812, -18, -22.071067812),
        (-7.071097101, -18, -22.071097101),
        (0, -15, 3),
        (10, -18, -7.5),
        (10, -16.5, 1.5),
        (-10, -18, -7.50005),
        (0, -18, 0),
        (-10, -16.5, 1.5),
    ]]
    fillet(fillet8_edges, radius=FILLET8_R)


solid = part.part
